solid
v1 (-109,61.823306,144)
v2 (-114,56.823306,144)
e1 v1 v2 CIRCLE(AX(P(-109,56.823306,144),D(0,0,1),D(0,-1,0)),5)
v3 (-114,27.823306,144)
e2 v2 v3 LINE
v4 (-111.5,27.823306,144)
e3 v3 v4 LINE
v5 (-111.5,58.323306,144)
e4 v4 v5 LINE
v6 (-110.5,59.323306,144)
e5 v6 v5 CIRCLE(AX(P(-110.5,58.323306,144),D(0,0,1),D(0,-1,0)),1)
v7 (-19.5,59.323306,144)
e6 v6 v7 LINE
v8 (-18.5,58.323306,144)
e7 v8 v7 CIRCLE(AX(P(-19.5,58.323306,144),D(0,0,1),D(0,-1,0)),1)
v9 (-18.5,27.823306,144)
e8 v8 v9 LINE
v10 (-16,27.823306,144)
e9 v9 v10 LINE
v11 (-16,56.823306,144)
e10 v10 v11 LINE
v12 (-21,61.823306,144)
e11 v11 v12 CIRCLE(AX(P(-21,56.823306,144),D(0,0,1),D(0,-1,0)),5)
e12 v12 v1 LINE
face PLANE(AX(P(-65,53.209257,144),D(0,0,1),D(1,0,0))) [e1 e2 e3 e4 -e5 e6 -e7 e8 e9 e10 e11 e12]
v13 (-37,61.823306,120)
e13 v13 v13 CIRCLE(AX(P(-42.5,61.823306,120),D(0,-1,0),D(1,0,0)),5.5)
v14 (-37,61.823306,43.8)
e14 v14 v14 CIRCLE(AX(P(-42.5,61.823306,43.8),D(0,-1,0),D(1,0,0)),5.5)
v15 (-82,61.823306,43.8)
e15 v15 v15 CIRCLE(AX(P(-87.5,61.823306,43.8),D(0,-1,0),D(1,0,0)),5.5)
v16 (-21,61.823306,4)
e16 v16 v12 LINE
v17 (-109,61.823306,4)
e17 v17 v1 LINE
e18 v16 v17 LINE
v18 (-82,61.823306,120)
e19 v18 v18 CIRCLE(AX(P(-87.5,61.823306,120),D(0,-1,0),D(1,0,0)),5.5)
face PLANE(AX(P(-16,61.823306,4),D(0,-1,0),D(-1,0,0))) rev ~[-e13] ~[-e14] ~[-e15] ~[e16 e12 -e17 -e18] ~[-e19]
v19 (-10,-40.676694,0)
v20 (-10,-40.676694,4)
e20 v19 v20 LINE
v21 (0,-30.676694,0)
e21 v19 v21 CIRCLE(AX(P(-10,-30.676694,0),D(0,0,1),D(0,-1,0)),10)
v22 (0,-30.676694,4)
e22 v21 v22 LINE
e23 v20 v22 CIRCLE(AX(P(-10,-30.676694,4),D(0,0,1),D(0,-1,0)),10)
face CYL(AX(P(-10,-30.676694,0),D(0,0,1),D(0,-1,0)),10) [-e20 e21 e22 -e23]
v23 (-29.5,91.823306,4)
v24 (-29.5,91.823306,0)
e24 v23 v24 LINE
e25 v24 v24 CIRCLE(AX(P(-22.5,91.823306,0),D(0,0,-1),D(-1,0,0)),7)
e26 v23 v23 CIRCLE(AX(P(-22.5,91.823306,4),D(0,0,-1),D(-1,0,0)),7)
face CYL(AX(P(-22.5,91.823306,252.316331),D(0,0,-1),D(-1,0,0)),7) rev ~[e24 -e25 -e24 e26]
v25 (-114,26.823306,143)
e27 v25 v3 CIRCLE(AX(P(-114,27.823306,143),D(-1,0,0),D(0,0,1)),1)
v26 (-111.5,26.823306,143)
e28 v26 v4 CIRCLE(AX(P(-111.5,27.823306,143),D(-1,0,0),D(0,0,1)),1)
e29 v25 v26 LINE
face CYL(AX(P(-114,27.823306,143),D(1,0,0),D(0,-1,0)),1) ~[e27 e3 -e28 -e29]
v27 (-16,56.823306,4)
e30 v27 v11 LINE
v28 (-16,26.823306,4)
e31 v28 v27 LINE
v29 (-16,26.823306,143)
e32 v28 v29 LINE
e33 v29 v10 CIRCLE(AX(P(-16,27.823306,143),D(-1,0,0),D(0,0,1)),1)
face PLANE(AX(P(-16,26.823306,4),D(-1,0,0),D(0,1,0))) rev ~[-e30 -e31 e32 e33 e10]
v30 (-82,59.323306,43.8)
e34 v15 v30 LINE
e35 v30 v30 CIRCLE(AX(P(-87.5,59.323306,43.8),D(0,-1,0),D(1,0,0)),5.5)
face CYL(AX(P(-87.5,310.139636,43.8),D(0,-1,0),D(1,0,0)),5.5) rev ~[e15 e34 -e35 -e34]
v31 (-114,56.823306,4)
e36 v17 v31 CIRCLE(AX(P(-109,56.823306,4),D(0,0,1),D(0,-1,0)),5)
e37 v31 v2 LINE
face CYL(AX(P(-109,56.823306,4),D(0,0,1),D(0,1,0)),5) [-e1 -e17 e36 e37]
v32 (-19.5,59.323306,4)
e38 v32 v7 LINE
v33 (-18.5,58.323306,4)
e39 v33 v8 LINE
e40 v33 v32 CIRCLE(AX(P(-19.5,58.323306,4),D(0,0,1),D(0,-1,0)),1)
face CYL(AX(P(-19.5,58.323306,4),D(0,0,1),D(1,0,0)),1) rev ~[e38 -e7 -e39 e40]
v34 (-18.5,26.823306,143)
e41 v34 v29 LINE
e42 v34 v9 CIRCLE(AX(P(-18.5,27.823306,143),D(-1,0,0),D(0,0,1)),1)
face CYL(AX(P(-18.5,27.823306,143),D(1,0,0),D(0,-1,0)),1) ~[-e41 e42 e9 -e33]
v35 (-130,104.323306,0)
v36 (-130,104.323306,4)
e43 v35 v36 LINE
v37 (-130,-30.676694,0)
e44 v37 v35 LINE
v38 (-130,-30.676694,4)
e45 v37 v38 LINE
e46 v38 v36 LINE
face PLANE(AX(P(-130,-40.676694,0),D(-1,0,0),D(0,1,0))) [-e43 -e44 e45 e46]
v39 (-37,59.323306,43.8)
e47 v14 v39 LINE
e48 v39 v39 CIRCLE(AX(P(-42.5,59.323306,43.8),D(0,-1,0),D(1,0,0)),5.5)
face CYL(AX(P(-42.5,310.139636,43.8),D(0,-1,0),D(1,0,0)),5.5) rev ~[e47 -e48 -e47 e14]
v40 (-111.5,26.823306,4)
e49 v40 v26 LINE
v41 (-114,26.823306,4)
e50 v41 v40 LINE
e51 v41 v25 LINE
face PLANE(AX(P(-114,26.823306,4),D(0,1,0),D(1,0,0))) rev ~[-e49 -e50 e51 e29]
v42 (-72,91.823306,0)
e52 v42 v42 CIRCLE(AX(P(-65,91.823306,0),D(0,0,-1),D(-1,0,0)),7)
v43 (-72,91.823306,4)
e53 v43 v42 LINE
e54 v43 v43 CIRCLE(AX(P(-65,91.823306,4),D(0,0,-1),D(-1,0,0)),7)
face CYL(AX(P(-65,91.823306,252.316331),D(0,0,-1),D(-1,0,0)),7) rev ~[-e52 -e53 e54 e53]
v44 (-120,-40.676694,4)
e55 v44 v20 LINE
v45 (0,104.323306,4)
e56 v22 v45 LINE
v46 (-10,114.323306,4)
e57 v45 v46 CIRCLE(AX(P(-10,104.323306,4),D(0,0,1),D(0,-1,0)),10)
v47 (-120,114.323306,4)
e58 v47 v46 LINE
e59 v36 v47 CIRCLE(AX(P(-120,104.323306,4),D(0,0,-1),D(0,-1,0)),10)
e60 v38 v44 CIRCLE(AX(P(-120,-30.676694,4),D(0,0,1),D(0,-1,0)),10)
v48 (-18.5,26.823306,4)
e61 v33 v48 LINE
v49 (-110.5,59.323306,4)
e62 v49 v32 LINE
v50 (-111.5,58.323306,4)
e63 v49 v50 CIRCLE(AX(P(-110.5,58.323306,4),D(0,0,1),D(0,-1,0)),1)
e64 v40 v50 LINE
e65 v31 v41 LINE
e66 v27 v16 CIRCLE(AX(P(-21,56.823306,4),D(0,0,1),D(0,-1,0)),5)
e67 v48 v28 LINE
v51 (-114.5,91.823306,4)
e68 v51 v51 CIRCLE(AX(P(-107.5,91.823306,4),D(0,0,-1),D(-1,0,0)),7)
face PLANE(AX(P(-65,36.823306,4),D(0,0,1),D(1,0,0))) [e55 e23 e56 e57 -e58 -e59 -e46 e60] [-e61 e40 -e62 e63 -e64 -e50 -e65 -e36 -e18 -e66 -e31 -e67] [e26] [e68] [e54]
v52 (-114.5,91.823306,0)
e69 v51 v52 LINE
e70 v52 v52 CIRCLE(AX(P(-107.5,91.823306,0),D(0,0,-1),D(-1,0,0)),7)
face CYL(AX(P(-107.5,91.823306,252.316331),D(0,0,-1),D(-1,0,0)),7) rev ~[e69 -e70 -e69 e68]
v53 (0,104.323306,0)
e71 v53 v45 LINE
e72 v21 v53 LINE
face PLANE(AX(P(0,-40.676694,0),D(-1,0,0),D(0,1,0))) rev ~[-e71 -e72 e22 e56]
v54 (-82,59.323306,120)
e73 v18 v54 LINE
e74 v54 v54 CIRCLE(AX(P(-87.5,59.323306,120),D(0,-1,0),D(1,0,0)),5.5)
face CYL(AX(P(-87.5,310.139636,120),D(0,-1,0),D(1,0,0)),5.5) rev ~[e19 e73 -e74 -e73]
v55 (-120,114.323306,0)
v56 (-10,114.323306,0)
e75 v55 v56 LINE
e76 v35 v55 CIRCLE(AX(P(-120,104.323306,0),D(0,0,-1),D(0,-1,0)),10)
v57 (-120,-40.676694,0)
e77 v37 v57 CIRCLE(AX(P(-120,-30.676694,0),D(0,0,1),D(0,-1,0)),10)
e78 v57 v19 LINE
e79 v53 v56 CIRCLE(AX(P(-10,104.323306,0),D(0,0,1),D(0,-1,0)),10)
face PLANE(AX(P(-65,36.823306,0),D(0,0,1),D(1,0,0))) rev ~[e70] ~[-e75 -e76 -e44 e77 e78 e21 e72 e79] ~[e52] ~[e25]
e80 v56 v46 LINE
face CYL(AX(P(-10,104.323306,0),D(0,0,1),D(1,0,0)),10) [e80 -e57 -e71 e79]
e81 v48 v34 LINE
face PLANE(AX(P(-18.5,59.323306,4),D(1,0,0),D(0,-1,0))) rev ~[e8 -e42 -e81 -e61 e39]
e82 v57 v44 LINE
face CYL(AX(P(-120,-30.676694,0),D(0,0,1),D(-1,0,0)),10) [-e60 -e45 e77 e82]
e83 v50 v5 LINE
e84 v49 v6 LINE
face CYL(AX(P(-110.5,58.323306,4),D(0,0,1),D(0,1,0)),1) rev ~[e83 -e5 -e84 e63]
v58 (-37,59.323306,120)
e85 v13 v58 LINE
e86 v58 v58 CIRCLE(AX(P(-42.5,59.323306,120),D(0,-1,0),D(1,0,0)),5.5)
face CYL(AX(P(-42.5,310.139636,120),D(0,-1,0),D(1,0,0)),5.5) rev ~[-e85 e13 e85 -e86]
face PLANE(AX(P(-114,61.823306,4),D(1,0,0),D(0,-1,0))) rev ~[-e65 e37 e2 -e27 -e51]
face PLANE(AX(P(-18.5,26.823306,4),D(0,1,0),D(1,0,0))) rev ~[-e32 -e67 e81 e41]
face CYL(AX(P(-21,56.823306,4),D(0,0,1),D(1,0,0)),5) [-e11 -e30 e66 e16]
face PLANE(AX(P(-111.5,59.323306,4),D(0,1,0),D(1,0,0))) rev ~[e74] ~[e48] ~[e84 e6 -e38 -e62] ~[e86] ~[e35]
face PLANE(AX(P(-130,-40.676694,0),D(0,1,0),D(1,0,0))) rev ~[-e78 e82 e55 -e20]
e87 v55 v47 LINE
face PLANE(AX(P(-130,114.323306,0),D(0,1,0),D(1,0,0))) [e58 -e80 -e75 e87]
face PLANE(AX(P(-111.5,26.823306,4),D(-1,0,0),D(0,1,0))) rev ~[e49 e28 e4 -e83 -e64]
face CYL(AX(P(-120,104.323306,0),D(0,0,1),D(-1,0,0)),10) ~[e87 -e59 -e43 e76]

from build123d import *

# Parameters (mm, degrees)
F0_W     = 130
F0_H     = 155
F1_DEPTH = 4
F2_R     = 10
F4_DEPTH = 140
F5_R     = 5
F6_R     = 1
F7_R     = 1
F9_D     = 14
F11_D    = 11


# Not quite as in the source:
# - a feature names something its author has since deleted; it is built from what else it names


with BuildPart() as f1:
    # F0 (on Top) → F1 (new body)
    with BuildSketch(Plane.XY):
        with Locations((-65, 36.8233056366)):
            Rectangle(F0_W, F0_H)
    extrude(amount=F1_DEPTH)

    # F2
    f2_edges = [f1.edges().sort_by_distance(p)[0] for p in [
        (0, -40.676694, 2),
        (0, 114.323306, 2),
        (-130, 114.323306, 2),
        (-130, -40.676694, 2),
    ]]
    fillet(f2_edges, radius=F2_R)

    # F3 (on face) → F4 (join)
    with BuildSketch(Plane.XY.offset(4)):
        Polygon((-16, 26.8233056366), (-16, 61.8233056366), (-114, 61.8233056366), (-114, 26.8233056366), (-111.5, 26.8233056366), (-111.5, 59.3233056366), (-18.5, 59.3233056366), (-18.5, 26.8233056366), align=None)
    extrude(amount=F4_DEPTH)

    # F5
    f5_edges = [f1.edges().sort_by_distance(p)[0] for p in [
        (-114, 61.823306, 74),
        (-16, 61.823306, 74),
    ]]
    fillet(f5_edges, radius=F5_R)

    # F6
    f6_edges = [f1.edges().sort_by_distance(p)[0] for p in [
        (-18.5, 59.323306, 74),
        (-111.5, 59.323306, 74),
    ]]
    fillet(f6_edges, radius=F6_R)

    # F7
    f7_edges = [f1.edges().sort_by_distance(p)[0] for p in [
        (-112.75, 26.823306, 144),
        (-17.25, 26.823306, 144),
    ]]
    fillet(f7_edges, radius=F7_R)

    # F9 (through all)
    with Locations(Plane.XY.offset(4)):
        with Locations((-22.5, 91.8233056366), (-65, 91.8233056366), (-107.5, 91.8233056366)):
            Hole(F9_D / 2)

    # F11 (through all)
    with Locations(Plane(origin=(0, 61.8233056366, 0), x_dir=(-1, 0, 0), z_dir=(0, 1, 0))):
        with Locations((42.5, 43.8), (87.5, 43.8), (42.5, 120), (87.5, 120)):
            Hole(F11_D / 2)


solid = f1.part
